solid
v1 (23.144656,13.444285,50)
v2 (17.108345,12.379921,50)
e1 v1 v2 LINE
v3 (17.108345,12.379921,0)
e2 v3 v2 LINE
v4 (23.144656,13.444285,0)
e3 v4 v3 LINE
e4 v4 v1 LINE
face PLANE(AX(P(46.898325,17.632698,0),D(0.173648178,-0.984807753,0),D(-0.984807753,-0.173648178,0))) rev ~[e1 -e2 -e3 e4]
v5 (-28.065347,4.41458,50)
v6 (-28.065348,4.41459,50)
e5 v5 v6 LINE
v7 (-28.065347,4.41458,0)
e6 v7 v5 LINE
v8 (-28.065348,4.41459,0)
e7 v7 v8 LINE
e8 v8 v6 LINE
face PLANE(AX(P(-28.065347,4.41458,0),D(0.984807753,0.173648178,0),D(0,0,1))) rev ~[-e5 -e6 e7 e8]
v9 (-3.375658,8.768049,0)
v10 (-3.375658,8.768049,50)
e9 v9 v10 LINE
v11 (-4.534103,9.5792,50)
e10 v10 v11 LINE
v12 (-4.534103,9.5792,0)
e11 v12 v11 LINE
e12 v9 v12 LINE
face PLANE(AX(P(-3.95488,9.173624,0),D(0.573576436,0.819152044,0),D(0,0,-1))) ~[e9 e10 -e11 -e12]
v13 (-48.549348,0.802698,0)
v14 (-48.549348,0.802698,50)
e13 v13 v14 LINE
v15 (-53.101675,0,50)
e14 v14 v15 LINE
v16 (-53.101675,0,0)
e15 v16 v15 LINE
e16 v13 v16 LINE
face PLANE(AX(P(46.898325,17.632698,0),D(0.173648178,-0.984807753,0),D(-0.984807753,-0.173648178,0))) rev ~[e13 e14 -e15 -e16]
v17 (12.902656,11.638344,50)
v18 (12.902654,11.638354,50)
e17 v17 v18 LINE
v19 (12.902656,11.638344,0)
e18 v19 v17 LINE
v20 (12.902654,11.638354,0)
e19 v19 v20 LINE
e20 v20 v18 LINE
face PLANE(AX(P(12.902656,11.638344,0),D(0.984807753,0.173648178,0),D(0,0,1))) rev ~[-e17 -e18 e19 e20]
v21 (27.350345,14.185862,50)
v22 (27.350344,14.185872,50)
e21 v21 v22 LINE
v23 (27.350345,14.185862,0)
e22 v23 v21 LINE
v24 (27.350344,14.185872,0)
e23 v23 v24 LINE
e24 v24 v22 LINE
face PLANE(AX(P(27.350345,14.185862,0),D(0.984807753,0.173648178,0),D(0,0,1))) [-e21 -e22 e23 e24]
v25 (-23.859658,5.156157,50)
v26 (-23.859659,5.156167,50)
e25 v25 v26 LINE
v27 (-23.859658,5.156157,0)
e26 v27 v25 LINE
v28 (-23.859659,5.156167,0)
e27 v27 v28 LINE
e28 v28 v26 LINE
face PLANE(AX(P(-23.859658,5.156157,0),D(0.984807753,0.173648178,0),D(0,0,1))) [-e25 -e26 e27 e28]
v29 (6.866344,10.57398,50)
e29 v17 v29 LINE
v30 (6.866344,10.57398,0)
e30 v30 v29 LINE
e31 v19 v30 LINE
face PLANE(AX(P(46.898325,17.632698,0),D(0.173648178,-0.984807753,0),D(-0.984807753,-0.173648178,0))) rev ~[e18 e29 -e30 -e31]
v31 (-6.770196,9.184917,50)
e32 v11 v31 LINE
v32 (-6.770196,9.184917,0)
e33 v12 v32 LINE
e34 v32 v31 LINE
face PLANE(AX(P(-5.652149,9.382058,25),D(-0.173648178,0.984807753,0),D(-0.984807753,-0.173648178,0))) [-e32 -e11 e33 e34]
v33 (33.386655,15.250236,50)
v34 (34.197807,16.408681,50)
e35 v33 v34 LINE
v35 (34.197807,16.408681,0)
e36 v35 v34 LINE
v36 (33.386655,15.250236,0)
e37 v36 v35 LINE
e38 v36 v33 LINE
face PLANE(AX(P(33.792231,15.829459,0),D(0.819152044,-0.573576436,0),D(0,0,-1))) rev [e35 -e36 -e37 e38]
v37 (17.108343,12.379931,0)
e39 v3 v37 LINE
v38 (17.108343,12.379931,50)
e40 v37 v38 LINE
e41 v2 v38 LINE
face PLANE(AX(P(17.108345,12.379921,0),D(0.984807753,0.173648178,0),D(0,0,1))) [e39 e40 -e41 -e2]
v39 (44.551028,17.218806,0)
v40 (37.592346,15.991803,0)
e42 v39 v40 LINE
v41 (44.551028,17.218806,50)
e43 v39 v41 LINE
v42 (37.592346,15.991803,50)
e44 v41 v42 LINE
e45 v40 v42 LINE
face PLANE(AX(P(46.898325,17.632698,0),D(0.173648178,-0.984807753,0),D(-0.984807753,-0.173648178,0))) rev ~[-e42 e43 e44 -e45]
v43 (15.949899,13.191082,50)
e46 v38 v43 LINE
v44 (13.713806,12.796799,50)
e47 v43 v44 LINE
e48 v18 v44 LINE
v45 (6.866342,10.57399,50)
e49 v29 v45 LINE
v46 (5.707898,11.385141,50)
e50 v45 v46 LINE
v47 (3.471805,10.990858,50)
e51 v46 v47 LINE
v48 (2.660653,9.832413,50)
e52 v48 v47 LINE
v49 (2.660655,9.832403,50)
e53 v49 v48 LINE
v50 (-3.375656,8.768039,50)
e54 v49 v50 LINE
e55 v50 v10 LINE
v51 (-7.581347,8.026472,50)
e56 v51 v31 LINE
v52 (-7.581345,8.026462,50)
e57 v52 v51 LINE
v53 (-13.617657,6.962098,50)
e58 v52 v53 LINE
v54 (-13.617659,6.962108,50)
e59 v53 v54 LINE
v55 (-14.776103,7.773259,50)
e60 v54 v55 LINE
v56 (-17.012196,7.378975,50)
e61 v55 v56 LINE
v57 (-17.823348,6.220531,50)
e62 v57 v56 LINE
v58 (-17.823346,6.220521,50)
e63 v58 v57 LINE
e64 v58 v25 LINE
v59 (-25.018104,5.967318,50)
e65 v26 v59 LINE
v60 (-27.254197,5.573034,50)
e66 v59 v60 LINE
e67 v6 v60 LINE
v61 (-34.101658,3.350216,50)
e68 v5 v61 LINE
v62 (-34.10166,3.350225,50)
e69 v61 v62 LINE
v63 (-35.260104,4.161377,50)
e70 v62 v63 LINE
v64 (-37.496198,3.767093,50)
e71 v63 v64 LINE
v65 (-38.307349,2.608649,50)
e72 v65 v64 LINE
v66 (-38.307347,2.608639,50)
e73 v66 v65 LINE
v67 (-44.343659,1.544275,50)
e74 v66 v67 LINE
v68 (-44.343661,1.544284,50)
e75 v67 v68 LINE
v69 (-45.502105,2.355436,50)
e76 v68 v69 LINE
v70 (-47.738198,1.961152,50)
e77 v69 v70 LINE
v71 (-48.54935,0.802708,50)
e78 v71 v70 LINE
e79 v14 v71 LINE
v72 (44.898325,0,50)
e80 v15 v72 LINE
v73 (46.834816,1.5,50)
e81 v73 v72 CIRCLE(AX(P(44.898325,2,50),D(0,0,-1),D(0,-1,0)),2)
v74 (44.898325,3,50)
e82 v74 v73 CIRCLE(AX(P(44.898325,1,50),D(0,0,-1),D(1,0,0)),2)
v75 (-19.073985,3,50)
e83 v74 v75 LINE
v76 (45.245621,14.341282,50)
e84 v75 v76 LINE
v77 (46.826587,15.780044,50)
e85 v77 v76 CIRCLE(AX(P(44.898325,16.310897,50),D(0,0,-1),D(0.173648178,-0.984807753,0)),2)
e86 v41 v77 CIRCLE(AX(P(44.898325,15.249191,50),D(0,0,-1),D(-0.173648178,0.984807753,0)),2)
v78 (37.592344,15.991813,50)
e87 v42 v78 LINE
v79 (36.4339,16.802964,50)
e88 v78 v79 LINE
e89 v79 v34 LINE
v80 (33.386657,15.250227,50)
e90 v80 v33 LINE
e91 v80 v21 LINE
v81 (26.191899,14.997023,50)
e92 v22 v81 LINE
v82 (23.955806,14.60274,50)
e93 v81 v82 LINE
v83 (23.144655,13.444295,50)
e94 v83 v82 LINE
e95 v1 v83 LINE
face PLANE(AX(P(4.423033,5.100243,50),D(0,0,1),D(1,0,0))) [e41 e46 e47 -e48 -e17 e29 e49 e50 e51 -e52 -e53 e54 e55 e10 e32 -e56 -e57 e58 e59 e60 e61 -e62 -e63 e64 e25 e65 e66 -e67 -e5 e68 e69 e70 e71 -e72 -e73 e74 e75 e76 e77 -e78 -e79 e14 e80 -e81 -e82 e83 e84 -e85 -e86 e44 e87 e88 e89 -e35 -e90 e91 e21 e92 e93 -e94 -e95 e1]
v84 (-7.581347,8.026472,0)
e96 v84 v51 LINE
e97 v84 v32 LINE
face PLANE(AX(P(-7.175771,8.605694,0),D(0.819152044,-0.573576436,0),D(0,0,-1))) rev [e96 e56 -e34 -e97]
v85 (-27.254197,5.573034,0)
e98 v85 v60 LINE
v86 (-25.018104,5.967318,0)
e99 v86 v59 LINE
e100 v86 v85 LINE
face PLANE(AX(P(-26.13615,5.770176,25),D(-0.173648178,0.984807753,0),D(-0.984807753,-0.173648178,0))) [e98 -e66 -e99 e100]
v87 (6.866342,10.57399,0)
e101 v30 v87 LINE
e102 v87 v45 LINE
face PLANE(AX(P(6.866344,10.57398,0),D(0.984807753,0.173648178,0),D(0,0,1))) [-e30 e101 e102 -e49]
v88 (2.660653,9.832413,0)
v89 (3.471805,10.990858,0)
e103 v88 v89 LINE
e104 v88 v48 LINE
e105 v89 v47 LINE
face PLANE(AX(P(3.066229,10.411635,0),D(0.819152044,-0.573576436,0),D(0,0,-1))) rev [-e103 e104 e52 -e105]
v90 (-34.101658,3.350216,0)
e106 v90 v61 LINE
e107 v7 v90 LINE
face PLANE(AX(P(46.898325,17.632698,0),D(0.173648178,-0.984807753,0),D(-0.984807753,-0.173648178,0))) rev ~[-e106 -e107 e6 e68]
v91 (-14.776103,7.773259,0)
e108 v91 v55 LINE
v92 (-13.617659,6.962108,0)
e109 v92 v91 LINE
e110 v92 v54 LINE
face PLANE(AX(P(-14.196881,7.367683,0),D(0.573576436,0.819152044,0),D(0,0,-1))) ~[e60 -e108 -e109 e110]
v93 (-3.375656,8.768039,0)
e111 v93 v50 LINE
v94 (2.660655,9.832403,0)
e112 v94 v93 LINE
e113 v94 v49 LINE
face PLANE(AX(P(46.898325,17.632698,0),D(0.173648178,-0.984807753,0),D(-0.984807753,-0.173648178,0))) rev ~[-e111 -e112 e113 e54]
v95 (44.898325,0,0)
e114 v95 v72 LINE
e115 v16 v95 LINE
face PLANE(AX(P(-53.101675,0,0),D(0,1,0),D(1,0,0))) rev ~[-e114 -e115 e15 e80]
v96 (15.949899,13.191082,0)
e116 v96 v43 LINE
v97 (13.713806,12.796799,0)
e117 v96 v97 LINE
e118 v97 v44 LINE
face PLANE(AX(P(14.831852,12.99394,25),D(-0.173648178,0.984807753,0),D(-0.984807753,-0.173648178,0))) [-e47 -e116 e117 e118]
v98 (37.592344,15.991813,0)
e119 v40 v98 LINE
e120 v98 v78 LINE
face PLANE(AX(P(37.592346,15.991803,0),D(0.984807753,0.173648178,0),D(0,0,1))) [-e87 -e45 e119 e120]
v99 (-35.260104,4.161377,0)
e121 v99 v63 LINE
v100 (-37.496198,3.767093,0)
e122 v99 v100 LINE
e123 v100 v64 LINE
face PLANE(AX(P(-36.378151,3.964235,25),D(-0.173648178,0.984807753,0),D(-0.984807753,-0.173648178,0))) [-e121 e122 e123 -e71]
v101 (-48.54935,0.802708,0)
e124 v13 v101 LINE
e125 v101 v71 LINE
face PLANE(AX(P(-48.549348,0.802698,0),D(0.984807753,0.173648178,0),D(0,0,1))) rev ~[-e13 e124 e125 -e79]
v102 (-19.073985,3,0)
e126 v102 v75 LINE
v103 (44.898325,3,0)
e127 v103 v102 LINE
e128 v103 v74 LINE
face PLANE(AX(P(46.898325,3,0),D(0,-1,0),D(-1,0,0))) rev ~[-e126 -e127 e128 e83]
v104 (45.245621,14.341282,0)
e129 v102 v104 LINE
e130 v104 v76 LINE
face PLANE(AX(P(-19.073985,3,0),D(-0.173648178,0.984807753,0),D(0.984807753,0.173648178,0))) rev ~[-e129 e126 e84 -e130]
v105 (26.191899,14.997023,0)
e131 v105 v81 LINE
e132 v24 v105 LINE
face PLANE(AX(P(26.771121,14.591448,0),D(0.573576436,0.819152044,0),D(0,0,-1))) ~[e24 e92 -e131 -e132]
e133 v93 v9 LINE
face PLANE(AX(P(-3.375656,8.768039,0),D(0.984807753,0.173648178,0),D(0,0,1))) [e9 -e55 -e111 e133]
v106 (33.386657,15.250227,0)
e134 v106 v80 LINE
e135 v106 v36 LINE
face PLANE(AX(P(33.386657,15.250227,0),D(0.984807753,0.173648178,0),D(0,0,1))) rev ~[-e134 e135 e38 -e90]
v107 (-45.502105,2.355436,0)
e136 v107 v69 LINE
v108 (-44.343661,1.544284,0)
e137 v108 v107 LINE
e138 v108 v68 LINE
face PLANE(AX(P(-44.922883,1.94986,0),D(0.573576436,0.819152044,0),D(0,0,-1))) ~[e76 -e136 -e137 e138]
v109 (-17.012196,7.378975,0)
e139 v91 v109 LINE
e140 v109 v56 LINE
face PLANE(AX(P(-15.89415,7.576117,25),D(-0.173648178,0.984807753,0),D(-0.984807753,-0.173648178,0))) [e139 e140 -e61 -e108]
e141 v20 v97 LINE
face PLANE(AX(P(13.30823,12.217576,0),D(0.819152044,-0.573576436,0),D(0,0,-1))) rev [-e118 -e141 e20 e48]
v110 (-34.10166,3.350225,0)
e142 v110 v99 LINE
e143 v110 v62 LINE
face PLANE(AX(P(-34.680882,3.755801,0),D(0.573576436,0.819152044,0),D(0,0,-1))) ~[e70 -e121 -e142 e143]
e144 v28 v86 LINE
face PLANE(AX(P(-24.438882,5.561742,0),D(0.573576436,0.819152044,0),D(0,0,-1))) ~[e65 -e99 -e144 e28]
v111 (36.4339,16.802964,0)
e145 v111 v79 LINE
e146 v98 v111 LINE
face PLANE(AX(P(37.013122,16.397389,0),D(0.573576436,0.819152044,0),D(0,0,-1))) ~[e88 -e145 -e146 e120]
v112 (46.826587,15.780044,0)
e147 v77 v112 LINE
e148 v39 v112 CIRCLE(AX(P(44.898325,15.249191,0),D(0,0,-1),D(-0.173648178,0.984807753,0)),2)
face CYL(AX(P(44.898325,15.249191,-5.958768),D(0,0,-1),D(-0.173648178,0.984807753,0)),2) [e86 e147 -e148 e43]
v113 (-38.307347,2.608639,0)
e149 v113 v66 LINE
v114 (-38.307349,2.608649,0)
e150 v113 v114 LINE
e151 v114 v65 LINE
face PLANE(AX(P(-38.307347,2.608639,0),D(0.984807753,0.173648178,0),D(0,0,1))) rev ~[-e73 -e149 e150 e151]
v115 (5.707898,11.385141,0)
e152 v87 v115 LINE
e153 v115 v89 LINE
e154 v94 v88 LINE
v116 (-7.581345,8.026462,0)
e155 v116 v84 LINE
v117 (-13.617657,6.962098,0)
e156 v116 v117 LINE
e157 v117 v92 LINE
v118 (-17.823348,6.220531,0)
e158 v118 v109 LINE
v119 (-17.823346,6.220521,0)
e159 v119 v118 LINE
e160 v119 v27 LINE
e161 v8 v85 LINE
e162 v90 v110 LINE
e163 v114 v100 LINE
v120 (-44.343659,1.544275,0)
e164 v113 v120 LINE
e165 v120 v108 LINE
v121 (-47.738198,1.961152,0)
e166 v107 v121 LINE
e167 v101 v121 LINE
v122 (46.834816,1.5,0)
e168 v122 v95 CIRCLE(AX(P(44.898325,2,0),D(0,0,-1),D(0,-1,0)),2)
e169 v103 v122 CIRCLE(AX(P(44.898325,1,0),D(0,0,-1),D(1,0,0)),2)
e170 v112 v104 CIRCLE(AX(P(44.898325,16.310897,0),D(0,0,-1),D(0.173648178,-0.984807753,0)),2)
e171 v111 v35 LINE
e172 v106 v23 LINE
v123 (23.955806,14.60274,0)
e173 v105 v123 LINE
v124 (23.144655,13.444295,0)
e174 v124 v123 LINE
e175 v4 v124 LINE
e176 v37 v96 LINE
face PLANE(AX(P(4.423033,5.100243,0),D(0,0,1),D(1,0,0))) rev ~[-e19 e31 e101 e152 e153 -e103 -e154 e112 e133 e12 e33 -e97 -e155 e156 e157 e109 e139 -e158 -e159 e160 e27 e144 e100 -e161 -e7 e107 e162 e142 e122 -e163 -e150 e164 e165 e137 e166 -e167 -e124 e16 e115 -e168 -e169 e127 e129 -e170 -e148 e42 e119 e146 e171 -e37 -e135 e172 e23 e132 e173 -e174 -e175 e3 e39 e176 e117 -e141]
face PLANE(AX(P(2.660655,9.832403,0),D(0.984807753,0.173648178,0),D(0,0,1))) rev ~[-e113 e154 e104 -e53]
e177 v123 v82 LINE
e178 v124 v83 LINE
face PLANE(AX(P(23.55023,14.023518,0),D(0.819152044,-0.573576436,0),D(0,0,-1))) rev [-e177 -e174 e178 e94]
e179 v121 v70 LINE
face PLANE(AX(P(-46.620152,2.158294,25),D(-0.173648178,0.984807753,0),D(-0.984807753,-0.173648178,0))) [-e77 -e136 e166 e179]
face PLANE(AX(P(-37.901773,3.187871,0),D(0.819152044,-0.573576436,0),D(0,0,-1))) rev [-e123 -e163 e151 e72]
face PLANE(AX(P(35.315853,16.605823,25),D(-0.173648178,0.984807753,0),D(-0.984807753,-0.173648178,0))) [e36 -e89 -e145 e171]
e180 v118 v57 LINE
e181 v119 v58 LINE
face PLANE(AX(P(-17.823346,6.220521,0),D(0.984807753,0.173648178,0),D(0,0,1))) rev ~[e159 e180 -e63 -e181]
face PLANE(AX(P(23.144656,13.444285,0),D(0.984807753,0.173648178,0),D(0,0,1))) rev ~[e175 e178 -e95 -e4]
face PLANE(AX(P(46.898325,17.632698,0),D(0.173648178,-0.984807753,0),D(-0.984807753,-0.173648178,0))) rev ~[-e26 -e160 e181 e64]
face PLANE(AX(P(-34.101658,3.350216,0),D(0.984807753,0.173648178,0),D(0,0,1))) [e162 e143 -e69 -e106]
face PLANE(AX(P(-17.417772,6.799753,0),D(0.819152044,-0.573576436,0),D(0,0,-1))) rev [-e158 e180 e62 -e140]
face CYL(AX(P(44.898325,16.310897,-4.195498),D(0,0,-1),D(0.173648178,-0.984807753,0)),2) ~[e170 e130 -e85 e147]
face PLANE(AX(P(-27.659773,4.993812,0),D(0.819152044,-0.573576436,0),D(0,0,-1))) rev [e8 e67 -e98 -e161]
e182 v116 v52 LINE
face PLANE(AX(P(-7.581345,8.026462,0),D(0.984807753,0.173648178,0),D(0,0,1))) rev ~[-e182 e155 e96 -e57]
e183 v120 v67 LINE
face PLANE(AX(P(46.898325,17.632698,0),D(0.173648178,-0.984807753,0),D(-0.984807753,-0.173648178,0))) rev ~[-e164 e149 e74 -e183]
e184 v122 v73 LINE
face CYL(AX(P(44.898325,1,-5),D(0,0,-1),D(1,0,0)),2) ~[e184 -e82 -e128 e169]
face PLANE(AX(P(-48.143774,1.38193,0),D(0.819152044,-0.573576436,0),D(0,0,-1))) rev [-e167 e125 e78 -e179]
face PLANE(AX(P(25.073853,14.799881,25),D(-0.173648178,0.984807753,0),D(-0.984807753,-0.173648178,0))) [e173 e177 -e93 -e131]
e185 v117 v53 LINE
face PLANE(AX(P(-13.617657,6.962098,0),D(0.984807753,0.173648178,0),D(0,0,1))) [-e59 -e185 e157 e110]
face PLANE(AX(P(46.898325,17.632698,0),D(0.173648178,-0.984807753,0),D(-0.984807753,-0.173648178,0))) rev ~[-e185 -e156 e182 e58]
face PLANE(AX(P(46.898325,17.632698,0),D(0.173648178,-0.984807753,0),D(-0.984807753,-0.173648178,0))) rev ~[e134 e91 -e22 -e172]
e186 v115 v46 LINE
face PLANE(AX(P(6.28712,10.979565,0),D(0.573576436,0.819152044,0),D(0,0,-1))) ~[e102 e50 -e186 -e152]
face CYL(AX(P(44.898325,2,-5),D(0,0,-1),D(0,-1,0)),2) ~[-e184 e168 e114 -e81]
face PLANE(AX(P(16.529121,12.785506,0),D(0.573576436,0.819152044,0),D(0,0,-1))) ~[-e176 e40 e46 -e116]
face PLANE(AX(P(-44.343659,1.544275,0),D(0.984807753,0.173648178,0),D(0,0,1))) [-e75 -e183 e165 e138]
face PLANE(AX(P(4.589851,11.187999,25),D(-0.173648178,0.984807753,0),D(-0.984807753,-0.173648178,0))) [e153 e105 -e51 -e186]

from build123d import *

# Parameters (mm, degrees)
F1_DEPTH    = 50
F2_T1_DEPTH = 61.9175359259
F2_T3_DEPTH = 58.3909963118
F2_T5_DEPTH = 60
F3_W        = 4.27056849
F3_H        = 50
F4_DEPTH    = 1
F5_SIZE     = 0.99999


# Not quite as in the source:
# - a fillet or chamfer that OpenCascade refuses, or shapes differently, is made with other operations: its cross-section is extruded or revolved along the edge and cut away or added
# - a fillet or chamfer is up to 0.001 mm smaller than in the source, because OpenCascade refuses the exact size


with BuildPart() as f1:
    # F0 (on Top) → F1 (new body)
    with BuildSketch(Plane.XY):
        Polygon((-53.1016754424, 0), (46.8983245576, 0), (46.8983245576, 3), (-19.0739845247, 3), (46.8983245576, 14.6326980708), (46.8983245576, 17.6326980708), align=None)
    extrude(amount=F1_DEPTH)

    # F2: fillet of radius 2 on 4 edges, made by hand

    # F2_s2 → F2_t1 (cut)
    with BuildSketch(Plane.XY.offset(-5.958767963)):
        with BuildLine():
            ThreePointArc((44.5510282023, 17.2188063917), (46.183899777, 16.7812797719), (46.8983245576, 15.2491908857))
            Line((46.8983245576, 15.2491908857), (46.8983245576, 17.6326980708))
            Line((46.8983245576, 17.6326980708), (44.5510282023, 17.2188063917))
        make_face()
    extrude(amount=F2_T1_DEPTH, mode=Mode.SUBTRACT)

    # F2_s4 → F2_t3 (cut)
    with BuildSketch(Plane.XY.offset(-4.1954981559)):
        with BuildLine():
            ThreePointArc((45.245620913, 14.3412818272), (46.4304134439, 15.0253221138), (46.8983245576, 16.3108973332))
            Line((46.8983245576, 16.3108973332), (46.8983245576, 14.6326980708))
            Line((46.8983245576, 14.6326980708), (45.245620913, 14.3412818272))
        make_face()
    extrude(amount=F2_T3_DEPTH, mode=Mode.SUBTRACT)

    # F2_s6 → F2_t5 (cut)
    with BuildSketch(Plane.XY.offset(-5)):
        with BuildLine():
            ThreePointArc((46.8983245576, 1), (46.31253812, 2.4142135624), (44.8983245576, 3))
            Line((44.8983245576, 3), (46.8983245576, 3))
            Line((46.8983245576, 3), (46.8983245576, 1))
        make_face()
        with BuildLine():
            ThreePointArc((44.8983245576, 0), (46.31253812, 0.5857864376), (46.8983245576, 2))
            Line((46.8983245576, 2), (46.8983245576, 0))
            Line((46.8983245576, 0), (44.8983245576, 0))
        make_face()
    extrude(amount=F2_T5_DEPTH, mode=Mode.SUBTRACT)

    # F3 (on face) → F4 (join)
    with BuildSketch(Plane(origin=(-1.6012114389, 9.0809213228, 0), x_dir=(-0.984807753, -0.1736481777, 0), z_dir=(-0.1736481777, 0.984807753, 0))):
        with Locations((45.5371029675, 25)):
            Rectangle(F3_W, F3_H)
        with Locations((35.1371029675, 25)):
            Rectangle(F3_W, F3_H)
        with Locations((24.7371029675, 25)):
            Rectangle(F3_W, F3_H)
        with Locations((14.3371029675, 25)):
            Rectangle(F3_W, F3_H)
        with Locations((3.9371029675, 25)):
            Rectangle(F3_W, F3_H)
        with Locations((-6.4628970325, 25)):
            Rectangle(F3_W, F3_H)
        with Locations((-16.8628970325, 25)):
            Rectangle(F3_W, F3_H)
        with Locations((-27.2628970325, 25)):
            Rectangle(F3_W, F3_H)
        with Locations((-37.6628970325, 25)):
            Rectangle(F3_W, F3_H)
    extrude(amount=F4_DEPTH)

    # F5 (size 1 in the source; OpenCascade refuses exactly that, so slightly less here)
    f5_edges = [f1.edges().sort_by_distance(p)[0] for p in [
        (-48.722996, 1.787506, 25),
        (-44.517307, 2.529082, 25),
        (-38.480996, 3.593447, 25),
        (-34.275307, 4.335023, 25),
        (-28.238995, 5.399388, 25),
        (-24.033306, 6.140964, 25),
        (-17.996994, 7.205329, 25),
        (-13.791305, 7.946905, 25),
        (-7.754994, 9.01127, 25),
        (-3.549305, 9.752847, 25),
        (2.487007, 10.817211, 25),
        (6.692696, 11.558788, 25),
        (12.729008, 12.623152, 25),
        (16.934697, 13.364729, 25),
        (22.971008, 14.429093, 25),
        (27.176697, 15.17067, 25),
        (33.213009, 16.235034, 25),
        (37.418698, 16.976611, 25),
    ]]
    chamfer(f5_edges, length=F5_SIZE)


solid = f1.part
